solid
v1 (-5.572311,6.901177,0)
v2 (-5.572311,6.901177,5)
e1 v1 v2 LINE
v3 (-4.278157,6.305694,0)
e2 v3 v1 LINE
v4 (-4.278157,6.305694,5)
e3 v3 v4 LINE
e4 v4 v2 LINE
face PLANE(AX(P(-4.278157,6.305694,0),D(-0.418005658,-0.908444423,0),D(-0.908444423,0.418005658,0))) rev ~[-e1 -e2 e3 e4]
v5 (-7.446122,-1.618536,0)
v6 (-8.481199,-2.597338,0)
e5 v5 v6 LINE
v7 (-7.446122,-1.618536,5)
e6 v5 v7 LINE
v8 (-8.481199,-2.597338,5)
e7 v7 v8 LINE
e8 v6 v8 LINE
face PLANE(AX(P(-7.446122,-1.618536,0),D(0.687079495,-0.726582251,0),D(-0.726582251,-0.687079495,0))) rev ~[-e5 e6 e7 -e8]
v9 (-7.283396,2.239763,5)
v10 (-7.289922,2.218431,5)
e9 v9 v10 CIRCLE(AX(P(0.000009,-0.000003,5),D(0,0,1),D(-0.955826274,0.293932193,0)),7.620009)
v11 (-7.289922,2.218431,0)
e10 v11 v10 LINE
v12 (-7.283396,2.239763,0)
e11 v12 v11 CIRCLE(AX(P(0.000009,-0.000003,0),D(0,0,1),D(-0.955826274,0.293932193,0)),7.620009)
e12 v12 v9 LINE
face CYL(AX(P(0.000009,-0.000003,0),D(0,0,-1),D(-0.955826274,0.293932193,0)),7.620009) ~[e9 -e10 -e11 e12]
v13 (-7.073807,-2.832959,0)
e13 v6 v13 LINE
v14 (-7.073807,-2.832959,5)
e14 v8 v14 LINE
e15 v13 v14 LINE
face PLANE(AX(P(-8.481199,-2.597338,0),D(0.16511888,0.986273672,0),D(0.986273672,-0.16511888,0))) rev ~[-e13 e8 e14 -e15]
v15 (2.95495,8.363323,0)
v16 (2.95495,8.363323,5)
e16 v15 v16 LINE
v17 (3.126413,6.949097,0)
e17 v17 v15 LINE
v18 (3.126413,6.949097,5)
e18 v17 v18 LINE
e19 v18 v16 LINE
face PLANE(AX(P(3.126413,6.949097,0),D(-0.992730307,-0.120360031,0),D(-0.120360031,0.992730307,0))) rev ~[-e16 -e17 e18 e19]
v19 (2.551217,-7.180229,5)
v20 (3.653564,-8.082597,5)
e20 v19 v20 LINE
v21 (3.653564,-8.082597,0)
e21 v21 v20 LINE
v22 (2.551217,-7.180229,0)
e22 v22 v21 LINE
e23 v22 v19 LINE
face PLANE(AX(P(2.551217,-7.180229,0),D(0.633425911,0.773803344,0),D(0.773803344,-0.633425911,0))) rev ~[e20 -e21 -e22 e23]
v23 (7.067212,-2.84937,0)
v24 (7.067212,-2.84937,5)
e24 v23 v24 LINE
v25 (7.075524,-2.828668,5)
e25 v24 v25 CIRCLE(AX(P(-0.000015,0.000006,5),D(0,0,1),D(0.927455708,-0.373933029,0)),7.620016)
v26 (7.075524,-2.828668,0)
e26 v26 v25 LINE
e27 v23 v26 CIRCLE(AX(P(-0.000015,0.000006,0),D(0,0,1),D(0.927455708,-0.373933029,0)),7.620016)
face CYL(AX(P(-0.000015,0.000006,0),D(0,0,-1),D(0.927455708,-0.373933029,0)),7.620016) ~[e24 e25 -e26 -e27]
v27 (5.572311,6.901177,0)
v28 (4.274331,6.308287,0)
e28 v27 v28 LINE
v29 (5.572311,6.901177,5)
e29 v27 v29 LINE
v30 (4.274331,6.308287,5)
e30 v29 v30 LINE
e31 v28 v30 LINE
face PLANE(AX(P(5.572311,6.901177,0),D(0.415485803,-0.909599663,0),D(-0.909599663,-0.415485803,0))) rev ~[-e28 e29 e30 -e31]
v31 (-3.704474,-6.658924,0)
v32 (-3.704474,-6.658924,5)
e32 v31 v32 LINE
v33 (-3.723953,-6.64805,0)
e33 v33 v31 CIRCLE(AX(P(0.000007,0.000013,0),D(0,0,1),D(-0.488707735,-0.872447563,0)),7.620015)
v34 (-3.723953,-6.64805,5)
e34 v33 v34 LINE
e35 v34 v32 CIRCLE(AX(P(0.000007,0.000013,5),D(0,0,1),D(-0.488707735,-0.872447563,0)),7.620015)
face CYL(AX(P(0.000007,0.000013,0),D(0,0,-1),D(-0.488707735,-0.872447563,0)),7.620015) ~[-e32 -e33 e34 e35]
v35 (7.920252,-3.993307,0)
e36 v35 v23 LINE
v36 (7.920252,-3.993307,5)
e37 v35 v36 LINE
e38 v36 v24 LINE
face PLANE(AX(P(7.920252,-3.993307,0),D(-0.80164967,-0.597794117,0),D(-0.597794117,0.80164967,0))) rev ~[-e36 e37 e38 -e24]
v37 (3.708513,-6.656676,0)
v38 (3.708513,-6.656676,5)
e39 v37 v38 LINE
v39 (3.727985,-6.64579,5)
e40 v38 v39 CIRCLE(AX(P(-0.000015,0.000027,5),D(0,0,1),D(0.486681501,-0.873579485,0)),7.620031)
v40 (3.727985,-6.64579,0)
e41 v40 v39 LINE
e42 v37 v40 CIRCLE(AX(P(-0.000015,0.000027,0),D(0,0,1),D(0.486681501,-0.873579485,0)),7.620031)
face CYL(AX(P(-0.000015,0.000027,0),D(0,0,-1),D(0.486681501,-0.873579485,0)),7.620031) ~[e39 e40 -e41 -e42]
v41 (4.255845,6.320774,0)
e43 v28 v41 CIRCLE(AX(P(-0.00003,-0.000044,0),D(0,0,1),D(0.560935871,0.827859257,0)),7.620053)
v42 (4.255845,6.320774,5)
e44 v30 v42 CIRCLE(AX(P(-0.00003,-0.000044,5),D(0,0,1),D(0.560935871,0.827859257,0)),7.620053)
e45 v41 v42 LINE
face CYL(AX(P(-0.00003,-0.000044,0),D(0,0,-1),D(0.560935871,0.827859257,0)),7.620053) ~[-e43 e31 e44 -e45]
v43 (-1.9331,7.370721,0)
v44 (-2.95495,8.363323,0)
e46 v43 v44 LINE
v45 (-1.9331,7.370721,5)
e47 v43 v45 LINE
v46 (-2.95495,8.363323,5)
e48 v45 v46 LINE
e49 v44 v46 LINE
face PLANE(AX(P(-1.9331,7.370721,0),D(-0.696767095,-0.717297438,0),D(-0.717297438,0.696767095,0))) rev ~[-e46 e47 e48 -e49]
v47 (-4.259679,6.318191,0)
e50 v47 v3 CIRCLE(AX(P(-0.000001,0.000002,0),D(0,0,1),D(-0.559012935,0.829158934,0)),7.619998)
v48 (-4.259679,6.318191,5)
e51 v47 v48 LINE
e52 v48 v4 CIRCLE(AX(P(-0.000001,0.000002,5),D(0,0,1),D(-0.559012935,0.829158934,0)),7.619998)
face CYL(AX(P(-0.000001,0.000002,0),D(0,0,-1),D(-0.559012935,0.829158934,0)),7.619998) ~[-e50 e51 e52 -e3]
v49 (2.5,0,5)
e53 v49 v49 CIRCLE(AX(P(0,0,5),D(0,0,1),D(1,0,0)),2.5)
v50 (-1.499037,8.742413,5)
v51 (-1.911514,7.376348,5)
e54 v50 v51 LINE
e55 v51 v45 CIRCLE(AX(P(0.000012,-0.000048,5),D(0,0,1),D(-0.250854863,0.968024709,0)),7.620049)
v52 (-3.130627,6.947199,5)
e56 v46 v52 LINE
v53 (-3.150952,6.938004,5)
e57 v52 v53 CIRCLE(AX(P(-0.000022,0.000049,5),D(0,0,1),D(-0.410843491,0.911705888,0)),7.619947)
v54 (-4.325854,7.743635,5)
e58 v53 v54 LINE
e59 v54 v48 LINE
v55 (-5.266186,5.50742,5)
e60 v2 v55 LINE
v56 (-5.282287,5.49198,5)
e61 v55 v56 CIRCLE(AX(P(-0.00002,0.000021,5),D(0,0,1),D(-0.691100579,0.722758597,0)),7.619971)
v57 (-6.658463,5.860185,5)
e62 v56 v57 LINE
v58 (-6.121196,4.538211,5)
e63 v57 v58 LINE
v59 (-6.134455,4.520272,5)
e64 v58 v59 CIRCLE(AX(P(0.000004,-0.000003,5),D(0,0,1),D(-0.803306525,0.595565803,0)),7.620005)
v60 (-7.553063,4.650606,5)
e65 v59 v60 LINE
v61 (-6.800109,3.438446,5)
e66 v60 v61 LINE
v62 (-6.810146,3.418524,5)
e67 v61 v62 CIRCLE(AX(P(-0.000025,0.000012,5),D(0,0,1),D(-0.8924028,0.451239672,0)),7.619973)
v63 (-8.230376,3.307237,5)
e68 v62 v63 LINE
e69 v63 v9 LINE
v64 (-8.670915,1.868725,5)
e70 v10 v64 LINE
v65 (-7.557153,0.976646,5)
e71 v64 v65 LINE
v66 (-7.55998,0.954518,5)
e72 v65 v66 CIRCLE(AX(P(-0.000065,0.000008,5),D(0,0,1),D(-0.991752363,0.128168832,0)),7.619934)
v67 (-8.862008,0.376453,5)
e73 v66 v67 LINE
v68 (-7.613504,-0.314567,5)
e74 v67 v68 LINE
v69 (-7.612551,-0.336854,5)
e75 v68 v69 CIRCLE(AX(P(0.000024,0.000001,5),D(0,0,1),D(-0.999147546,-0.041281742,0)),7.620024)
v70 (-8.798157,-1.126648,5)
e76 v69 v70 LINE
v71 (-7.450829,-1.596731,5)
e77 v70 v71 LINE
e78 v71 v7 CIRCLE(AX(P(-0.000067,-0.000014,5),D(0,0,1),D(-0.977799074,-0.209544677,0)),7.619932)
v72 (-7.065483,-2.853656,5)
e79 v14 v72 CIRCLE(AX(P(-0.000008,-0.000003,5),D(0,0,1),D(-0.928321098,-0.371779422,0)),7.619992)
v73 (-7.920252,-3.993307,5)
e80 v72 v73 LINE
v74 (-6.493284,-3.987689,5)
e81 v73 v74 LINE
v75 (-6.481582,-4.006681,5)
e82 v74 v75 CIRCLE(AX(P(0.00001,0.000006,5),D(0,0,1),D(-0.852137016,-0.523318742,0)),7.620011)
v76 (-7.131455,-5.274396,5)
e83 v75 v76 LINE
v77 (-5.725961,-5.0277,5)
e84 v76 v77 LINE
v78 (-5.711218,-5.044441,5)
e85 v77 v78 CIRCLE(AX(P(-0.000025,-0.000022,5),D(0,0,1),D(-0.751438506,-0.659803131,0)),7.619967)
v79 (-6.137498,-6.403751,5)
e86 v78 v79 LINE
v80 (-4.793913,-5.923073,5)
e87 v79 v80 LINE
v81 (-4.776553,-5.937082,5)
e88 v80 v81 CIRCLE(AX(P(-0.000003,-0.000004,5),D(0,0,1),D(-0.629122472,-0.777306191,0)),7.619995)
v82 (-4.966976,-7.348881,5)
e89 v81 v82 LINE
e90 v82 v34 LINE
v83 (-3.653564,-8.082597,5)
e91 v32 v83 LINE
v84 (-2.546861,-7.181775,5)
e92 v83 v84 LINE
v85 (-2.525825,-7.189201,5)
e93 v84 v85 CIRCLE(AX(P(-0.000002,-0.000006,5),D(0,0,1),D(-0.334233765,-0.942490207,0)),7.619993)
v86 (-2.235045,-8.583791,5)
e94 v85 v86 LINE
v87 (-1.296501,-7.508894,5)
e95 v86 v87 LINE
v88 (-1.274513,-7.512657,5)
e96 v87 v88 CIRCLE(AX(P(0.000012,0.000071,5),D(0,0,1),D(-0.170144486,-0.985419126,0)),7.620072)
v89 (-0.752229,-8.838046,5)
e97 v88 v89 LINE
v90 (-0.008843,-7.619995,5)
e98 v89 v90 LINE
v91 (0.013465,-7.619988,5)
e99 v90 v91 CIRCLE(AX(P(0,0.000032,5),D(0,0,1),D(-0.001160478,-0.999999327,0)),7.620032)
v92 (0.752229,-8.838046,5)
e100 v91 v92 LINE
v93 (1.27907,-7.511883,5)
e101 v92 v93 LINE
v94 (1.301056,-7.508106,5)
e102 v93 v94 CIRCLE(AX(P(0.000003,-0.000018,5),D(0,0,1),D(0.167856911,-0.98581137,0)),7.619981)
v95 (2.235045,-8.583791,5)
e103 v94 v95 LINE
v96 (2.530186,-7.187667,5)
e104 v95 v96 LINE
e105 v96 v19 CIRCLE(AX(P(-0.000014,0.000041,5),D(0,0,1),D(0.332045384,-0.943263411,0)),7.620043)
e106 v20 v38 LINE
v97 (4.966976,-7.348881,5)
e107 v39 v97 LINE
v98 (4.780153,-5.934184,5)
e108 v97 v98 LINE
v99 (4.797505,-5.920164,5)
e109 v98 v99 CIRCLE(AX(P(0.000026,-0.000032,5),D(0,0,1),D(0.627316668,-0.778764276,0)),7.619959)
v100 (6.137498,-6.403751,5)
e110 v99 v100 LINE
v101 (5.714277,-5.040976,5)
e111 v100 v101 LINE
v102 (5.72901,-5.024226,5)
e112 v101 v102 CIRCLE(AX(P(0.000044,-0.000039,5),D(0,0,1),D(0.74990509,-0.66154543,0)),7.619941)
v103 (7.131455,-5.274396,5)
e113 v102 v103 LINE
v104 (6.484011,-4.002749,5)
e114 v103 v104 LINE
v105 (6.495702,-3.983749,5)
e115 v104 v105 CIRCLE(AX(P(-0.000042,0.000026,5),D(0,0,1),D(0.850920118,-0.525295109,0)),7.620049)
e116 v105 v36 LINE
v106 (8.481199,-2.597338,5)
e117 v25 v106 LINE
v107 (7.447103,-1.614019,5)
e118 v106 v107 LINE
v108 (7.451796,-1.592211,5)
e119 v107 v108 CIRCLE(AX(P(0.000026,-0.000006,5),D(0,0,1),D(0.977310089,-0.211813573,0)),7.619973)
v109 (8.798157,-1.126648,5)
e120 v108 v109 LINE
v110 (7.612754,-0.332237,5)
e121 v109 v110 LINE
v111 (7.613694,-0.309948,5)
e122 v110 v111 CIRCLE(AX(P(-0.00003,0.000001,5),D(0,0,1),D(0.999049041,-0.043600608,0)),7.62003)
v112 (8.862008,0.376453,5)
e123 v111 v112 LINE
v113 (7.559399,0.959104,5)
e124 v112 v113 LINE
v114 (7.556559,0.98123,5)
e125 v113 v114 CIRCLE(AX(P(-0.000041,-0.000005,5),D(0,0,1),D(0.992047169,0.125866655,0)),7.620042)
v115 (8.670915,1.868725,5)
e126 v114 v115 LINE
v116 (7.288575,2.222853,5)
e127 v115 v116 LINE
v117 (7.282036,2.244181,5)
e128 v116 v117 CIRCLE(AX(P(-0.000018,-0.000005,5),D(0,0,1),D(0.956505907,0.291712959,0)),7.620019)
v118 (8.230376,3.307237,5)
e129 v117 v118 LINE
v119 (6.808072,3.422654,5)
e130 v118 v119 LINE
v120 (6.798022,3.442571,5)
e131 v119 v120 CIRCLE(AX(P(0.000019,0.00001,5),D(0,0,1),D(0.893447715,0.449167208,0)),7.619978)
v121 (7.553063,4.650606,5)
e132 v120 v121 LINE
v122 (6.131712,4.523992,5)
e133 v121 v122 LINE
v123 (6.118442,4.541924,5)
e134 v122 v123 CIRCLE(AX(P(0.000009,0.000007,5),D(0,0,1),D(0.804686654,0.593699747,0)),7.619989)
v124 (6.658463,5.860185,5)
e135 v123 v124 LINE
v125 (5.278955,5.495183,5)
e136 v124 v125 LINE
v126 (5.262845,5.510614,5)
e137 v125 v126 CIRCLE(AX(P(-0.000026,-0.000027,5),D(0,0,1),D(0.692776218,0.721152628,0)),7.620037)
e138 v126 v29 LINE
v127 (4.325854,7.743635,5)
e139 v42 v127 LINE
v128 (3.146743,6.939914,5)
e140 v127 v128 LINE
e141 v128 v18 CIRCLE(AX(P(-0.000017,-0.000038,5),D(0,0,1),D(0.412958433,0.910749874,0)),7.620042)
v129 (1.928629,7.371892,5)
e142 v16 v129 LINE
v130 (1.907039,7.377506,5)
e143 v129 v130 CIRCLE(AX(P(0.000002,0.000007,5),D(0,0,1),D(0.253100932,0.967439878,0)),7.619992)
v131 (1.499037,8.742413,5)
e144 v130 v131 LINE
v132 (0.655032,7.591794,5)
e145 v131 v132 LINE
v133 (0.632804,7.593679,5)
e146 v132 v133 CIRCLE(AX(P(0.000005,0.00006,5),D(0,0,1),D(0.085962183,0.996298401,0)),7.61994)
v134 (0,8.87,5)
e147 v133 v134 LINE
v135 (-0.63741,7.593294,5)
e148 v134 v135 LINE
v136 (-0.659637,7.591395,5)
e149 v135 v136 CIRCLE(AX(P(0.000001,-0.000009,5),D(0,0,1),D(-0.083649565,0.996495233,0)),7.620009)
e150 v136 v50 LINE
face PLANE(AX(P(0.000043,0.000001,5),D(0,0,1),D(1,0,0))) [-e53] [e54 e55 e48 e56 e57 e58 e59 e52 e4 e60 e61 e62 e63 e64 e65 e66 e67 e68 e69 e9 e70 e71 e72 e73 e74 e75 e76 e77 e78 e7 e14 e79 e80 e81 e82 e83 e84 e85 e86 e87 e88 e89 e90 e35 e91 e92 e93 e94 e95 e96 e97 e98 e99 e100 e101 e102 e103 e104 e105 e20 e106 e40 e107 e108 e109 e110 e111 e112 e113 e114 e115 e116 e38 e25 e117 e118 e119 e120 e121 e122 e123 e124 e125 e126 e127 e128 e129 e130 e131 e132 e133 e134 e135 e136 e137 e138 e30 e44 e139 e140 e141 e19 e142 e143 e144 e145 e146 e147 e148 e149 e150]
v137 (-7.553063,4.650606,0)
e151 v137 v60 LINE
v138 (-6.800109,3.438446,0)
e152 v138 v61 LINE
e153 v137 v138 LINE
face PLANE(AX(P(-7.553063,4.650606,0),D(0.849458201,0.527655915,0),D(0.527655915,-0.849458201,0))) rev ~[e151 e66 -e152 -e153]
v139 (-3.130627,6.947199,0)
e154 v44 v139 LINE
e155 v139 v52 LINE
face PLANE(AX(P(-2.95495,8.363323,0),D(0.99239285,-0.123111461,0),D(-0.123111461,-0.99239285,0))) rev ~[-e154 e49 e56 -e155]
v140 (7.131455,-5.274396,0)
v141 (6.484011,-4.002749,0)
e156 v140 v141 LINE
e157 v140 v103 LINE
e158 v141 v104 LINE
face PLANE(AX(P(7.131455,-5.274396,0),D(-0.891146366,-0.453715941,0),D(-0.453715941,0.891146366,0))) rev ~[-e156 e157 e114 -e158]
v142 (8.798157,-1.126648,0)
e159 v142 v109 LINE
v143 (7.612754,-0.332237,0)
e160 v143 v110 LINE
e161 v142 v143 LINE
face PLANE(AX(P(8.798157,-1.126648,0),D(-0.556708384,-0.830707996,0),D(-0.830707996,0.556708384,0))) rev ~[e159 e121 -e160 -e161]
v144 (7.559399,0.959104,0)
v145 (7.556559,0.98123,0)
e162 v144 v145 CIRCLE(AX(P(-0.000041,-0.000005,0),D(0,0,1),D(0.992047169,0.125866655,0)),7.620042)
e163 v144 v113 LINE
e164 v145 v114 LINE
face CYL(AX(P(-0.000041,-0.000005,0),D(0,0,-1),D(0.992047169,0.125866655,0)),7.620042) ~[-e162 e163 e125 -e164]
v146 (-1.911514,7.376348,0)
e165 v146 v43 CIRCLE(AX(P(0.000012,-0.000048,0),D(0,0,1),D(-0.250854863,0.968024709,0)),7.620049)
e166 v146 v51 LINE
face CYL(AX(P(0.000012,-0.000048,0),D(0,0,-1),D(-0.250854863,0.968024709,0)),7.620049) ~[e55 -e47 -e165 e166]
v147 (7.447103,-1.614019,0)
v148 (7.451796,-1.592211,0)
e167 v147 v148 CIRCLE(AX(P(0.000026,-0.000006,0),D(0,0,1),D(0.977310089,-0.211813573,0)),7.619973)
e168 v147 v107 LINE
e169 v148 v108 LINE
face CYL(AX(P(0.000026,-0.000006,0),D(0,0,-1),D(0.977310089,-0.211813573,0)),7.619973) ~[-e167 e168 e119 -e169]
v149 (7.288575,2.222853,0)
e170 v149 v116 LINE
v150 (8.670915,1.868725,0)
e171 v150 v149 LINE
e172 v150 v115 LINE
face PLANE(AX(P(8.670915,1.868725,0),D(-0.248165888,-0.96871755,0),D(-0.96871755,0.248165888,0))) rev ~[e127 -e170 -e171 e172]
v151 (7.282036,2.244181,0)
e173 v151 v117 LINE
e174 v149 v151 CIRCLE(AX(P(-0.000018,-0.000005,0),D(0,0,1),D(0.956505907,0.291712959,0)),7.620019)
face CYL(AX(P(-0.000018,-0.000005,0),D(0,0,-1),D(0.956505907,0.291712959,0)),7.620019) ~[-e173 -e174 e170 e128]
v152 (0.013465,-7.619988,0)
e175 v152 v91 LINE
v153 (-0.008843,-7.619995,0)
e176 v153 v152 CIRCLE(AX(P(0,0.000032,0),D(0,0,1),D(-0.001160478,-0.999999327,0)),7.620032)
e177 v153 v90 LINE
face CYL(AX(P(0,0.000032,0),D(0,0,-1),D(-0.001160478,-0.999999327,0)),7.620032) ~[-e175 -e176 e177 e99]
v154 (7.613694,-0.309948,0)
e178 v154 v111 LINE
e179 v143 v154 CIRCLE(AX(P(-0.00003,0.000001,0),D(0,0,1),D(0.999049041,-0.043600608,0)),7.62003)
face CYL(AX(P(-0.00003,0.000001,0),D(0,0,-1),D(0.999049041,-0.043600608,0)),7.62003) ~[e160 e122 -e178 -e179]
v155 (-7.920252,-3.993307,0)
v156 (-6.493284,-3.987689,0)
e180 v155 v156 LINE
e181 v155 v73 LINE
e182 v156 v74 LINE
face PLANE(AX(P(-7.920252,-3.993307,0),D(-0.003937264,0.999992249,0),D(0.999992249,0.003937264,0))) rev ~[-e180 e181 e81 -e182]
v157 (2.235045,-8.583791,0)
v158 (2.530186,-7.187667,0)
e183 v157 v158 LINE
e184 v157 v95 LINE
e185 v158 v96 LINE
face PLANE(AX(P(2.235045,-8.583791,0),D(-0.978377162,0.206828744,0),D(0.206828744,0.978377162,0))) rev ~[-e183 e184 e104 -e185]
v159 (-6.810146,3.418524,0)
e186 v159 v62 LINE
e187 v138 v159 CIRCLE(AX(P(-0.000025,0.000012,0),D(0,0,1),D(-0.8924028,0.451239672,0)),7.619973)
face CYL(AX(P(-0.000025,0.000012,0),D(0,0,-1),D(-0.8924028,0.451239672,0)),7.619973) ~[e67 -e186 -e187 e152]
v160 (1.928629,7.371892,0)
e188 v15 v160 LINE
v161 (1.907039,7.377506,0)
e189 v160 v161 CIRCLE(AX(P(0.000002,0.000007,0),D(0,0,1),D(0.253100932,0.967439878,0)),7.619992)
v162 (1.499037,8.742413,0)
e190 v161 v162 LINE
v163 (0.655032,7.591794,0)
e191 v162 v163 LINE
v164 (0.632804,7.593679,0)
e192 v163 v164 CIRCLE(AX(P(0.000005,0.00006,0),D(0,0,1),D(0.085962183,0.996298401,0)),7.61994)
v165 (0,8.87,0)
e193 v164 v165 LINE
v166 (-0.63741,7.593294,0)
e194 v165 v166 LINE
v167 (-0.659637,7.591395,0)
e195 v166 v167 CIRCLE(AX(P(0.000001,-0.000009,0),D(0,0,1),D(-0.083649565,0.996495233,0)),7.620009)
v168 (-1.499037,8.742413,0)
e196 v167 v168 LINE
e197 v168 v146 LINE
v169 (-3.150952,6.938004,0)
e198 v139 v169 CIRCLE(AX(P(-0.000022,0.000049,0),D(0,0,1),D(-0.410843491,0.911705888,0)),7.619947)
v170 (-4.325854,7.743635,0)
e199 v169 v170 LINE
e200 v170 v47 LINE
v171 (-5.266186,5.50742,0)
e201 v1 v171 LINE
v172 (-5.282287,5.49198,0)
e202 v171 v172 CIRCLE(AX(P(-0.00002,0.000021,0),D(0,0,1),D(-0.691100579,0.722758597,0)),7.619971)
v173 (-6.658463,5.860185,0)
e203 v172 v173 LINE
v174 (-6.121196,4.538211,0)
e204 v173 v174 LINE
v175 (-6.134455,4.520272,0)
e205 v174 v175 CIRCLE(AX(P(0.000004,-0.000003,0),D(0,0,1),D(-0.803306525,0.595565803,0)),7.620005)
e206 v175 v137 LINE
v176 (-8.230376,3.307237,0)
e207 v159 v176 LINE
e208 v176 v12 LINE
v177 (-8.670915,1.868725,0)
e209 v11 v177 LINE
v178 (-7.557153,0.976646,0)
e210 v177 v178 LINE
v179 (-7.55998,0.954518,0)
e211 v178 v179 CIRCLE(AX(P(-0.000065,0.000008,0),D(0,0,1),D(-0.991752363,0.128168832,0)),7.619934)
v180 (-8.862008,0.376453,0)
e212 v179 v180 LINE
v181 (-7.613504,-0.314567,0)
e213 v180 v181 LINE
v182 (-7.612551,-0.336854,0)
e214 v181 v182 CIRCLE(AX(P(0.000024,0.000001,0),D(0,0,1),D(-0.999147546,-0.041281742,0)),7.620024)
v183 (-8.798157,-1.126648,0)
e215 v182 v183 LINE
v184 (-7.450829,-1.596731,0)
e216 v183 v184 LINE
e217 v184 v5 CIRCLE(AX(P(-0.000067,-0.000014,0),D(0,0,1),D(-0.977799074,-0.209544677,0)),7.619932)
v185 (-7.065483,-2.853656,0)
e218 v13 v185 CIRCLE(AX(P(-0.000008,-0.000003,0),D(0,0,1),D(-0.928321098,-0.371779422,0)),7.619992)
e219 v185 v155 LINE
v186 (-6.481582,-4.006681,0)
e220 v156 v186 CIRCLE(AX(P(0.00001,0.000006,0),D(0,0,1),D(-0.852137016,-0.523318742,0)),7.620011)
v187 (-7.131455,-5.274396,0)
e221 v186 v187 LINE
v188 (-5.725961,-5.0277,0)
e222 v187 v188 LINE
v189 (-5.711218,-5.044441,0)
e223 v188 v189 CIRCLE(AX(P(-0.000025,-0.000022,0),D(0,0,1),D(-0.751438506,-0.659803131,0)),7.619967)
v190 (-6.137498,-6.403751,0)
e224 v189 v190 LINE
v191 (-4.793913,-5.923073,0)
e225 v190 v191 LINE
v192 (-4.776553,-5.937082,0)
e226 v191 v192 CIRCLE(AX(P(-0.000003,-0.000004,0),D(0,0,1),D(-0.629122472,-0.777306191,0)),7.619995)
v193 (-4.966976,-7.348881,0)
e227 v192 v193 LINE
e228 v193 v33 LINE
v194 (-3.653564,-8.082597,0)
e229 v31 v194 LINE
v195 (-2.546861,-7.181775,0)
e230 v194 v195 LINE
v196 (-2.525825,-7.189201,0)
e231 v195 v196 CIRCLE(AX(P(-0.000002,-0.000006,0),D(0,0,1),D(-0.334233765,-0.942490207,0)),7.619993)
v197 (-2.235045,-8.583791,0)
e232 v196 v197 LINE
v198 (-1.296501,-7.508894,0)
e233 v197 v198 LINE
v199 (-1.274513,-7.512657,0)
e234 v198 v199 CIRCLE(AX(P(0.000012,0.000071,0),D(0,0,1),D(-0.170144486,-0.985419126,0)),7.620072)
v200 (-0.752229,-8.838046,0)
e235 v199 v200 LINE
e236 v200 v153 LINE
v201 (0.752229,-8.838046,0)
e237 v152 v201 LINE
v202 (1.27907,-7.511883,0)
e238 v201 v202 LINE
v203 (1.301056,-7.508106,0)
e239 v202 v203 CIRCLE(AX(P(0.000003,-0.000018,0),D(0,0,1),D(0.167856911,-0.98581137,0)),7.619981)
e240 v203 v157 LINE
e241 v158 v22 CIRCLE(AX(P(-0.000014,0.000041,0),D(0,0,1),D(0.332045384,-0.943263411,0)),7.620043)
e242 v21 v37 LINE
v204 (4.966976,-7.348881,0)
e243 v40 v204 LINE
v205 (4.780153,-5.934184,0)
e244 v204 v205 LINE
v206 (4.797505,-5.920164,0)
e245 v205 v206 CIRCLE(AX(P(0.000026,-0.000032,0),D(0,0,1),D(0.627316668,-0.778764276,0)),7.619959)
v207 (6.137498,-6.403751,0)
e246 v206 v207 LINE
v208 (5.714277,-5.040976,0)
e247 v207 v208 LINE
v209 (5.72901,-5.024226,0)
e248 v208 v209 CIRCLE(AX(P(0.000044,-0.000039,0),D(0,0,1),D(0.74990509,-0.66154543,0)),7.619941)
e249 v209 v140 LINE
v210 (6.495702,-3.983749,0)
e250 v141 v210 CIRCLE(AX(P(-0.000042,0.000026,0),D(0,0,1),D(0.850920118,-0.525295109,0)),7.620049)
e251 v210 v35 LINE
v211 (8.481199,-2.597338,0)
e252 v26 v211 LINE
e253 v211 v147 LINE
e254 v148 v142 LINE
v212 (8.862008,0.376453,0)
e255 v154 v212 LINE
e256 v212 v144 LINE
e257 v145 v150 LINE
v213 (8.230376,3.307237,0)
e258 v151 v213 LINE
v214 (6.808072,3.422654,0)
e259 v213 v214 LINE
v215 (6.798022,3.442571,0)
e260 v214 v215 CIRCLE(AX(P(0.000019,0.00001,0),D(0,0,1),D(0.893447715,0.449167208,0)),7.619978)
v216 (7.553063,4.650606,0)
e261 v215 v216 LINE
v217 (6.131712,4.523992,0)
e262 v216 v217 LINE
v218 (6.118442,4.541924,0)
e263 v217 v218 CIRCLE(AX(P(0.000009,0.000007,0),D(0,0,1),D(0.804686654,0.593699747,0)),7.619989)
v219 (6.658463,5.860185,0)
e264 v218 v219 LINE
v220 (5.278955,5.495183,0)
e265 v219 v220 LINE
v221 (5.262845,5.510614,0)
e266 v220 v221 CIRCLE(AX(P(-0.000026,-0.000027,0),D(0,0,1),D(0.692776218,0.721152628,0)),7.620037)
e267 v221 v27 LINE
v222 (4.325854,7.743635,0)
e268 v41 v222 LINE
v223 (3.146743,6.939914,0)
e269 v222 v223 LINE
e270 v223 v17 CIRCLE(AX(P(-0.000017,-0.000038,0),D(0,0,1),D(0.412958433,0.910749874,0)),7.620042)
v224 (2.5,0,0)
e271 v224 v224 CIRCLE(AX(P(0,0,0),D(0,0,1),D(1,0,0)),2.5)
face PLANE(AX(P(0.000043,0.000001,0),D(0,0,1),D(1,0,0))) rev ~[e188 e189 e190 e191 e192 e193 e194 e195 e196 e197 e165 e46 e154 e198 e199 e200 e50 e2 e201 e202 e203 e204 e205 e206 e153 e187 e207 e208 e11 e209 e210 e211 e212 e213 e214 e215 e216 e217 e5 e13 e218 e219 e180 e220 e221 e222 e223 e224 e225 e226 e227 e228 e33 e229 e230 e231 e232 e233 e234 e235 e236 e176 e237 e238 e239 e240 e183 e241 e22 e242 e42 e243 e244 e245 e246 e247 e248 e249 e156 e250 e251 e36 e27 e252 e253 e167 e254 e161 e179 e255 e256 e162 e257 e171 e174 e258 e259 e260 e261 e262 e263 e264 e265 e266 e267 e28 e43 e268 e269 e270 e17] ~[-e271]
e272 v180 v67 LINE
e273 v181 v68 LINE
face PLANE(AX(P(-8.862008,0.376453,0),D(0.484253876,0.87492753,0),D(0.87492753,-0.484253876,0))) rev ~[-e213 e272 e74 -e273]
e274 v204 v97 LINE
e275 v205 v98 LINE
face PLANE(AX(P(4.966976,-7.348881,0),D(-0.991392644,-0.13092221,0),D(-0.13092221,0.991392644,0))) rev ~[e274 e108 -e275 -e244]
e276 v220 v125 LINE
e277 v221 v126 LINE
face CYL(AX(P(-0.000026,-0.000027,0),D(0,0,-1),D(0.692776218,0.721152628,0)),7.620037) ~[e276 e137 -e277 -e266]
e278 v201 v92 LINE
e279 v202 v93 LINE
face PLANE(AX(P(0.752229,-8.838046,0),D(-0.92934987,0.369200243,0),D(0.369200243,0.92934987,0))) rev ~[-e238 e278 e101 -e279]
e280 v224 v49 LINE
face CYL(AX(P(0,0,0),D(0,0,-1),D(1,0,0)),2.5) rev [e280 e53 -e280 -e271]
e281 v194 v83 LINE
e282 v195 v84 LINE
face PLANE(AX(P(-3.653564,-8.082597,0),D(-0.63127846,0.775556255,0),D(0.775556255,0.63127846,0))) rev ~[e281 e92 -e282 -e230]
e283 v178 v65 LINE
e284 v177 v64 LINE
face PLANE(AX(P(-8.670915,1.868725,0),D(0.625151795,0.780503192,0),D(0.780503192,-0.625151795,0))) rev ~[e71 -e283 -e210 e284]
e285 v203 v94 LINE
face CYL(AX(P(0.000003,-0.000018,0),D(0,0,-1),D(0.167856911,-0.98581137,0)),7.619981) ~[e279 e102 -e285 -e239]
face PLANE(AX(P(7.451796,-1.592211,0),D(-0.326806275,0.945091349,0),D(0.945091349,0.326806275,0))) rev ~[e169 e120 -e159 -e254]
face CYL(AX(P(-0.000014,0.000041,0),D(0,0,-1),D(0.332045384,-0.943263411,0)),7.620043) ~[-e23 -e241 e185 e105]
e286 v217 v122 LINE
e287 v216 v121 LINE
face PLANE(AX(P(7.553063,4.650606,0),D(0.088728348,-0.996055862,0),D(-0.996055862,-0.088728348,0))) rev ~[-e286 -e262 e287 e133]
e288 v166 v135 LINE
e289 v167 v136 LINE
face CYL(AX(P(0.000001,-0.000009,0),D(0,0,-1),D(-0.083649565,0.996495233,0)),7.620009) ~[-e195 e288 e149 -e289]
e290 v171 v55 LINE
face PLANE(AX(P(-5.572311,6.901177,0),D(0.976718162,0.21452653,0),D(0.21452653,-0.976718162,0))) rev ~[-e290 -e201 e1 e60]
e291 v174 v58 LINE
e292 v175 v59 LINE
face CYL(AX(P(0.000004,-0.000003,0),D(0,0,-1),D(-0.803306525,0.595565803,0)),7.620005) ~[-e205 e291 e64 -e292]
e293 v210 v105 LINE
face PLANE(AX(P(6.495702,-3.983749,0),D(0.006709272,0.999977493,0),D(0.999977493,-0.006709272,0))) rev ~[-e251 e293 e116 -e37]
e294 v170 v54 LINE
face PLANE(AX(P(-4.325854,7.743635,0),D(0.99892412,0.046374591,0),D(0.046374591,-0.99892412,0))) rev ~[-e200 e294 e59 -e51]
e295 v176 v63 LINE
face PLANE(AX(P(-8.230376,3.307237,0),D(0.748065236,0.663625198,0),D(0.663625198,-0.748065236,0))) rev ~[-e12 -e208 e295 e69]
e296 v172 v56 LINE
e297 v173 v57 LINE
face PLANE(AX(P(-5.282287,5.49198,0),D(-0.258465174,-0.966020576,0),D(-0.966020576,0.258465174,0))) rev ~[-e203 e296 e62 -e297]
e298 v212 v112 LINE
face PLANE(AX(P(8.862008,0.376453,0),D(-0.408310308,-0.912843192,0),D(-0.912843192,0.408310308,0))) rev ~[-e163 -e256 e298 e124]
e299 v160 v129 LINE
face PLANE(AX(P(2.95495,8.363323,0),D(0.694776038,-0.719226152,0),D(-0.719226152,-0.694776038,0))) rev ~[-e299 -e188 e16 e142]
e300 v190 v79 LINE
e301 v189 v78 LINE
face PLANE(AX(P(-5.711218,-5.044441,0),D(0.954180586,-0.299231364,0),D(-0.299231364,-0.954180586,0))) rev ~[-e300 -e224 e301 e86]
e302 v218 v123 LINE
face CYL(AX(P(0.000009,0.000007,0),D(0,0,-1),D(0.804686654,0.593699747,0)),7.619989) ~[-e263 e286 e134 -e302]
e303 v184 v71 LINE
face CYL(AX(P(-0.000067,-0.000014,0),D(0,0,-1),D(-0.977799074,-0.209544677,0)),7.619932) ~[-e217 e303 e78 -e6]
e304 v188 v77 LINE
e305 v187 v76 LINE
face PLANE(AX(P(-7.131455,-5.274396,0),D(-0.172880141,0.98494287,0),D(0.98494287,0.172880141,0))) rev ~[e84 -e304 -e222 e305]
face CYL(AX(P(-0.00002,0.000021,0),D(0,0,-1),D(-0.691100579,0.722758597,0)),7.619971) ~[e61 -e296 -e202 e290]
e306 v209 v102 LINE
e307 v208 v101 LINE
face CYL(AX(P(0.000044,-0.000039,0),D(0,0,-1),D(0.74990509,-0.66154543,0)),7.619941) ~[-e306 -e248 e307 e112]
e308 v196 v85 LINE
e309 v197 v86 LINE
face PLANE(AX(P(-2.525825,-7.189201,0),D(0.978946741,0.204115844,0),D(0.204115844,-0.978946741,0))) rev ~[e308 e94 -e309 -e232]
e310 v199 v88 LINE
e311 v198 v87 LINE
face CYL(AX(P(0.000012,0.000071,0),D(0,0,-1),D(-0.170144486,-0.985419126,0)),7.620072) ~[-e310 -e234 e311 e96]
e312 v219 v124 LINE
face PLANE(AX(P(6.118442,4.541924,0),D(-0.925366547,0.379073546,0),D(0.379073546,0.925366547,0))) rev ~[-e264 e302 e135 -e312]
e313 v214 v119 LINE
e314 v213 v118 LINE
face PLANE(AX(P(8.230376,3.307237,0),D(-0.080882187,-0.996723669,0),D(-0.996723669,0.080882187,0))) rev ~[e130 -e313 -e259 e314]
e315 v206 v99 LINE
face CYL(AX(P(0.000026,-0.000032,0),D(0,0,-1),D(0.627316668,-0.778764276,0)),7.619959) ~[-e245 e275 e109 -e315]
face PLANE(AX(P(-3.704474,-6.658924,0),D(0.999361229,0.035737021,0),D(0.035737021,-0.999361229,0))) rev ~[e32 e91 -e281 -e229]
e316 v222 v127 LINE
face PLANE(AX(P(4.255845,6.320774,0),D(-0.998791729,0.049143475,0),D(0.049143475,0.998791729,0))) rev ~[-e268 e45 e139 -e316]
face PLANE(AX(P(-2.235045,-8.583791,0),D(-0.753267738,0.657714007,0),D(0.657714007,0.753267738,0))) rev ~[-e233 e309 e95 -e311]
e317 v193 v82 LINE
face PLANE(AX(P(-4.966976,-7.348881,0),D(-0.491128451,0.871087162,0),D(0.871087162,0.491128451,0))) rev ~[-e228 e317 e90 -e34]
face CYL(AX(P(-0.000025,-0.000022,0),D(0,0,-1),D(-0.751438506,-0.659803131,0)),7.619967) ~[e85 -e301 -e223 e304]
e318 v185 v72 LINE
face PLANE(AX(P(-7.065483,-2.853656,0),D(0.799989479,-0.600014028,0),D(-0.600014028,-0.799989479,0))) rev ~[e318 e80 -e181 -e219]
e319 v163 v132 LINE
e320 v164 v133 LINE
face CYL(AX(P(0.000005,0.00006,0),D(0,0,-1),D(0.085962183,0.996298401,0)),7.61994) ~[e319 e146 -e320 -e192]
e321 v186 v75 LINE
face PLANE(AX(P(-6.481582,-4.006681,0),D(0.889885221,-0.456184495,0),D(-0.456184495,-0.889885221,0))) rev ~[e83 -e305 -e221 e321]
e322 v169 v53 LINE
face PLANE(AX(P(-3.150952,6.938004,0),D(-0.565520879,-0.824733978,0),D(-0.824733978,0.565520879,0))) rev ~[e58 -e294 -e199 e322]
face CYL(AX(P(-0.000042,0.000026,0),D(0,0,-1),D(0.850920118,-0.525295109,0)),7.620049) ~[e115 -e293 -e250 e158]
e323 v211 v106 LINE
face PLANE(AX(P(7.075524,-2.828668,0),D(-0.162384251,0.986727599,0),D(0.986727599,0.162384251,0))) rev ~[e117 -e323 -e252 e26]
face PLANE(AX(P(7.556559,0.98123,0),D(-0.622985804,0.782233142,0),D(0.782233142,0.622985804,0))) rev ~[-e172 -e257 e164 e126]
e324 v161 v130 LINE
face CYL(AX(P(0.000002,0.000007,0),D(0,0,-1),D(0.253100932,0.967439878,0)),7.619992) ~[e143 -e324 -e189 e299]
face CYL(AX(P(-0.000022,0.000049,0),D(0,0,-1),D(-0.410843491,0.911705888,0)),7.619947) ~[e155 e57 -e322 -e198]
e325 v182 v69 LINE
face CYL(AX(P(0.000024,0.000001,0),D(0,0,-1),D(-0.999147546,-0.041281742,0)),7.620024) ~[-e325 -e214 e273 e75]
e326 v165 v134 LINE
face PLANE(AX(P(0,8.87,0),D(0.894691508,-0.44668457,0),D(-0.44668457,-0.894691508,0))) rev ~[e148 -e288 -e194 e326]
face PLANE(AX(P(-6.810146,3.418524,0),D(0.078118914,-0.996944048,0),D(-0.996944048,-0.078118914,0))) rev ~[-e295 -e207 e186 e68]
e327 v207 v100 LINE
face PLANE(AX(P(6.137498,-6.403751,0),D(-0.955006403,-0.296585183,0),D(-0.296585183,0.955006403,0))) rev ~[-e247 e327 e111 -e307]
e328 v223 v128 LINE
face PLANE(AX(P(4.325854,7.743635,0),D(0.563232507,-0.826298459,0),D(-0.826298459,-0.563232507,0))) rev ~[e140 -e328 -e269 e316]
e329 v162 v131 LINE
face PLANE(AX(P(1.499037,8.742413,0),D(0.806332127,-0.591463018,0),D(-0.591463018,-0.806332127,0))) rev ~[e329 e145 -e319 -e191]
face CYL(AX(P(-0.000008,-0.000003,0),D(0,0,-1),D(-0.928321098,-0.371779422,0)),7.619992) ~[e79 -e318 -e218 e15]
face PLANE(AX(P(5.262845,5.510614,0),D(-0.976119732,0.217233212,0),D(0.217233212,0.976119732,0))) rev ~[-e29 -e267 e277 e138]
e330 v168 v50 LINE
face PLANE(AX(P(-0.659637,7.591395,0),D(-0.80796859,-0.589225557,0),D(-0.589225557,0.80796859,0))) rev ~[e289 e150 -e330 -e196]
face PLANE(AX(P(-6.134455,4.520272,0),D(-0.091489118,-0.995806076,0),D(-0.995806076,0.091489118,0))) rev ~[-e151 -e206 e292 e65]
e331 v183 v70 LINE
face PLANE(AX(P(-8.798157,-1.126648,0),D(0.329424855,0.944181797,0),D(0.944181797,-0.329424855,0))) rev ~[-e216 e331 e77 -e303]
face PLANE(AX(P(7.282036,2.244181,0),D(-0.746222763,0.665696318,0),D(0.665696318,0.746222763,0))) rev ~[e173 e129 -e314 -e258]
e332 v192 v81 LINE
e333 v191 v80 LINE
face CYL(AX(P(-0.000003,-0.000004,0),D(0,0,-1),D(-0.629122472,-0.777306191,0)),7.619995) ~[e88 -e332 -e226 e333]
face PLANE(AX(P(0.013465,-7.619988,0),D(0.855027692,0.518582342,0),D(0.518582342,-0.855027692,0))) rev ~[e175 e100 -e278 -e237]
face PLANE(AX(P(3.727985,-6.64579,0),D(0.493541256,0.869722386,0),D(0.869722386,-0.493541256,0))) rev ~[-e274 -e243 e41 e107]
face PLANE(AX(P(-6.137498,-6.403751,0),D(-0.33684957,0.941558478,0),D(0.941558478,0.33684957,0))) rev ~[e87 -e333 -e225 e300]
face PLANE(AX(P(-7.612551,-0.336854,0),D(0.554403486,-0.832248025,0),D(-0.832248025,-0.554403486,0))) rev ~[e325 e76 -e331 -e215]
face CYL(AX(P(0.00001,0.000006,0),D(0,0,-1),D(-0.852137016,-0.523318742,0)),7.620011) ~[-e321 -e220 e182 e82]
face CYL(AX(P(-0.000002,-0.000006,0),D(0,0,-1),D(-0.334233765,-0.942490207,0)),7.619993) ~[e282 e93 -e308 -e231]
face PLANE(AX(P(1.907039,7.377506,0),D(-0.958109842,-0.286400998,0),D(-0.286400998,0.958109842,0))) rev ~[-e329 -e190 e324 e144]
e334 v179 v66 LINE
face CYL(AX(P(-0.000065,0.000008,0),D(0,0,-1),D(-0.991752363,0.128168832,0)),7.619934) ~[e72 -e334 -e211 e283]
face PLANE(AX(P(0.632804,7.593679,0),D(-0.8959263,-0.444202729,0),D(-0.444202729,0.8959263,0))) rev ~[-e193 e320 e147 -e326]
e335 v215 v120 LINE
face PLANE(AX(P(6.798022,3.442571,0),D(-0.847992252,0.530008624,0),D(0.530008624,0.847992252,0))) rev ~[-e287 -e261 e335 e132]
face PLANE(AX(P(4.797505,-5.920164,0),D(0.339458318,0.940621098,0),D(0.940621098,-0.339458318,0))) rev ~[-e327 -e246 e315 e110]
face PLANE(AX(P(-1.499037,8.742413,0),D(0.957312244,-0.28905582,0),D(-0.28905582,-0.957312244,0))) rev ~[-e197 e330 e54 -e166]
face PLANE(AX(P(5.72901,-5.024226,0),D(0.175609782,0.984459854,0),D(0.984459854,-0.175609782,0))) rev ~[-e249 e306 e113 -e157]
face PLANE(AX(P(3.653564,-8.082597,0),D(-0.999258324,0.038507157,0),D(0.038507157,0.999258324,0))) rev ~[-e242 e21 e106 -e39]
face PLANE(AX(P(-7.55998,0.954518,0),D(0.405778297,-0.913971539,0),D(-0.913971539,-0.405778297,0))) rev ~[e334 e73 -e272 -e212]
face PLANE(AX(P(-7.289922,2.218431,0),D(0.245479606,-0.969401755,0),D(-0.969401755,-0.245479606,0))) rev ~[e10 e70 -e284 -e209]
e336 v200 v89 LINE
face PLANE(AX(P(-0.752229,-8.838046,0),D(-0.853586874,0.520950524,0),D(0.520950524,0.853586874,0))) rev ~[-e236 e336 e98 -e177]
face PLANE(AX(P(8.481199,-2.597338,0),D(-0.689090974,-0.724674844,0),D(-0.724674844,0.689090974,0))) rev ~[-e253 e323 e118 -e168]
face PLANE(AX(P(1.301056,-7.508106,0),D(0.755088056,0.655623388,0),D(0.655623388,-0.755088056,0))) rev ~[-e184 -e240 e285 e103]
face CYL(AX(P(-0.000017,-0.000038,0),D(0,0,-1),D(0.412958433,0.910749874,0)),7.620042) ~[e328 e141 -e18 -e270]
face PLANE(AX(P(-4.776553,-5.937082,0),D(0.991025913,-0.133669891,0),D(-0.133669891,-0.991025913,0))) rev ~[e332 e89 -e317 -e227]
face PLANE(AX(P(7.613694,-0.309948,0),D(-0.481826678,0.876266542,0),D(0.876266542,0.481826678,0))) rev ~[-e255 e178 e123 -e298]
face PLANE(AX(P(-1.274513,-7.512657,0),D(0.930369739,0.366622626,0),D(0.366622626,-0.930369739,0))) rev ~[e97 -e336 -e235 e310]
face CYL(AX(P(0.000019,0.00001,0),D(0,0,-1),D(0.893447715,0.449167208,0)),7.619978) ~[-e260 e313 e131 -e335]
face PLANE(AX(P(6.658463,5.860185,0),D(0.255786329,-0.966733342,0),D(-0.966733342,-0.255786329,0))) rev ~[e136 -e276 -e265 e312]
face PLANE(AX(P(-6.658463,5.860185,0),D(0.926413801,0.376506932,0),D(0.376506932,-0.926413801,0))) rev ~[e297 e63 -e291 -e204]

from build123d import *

# Parameters (mm, degrees)
F0_R     = 2.5
F1_DEPTH = 5


# Not quite as in the source:
# - a feature names something its author has since deleted; it is built from what else it names


with BuildPart() as f1:
    # F0 (on Top) → F1 (new body)
    with BuildSketch(Plane.XY):
        with BuildLine():
            ThreePointArc((0.6328035034, 7.5936789322), (-0.0023111215, 7.6199996495), (-0.6374096636, 7.5932936807))
            ThreePointArc((-0.6374096636, 7.5932936807), (-0.6485239105, 7.5923525167), (-0.6596367677, 7.5913950849))
            ThreePointArc((-0.6596367677, 7.5913950849), (-1.2900640698, 7.51000231), (-1.9115139669, 7.3763483076))
            ThreePointArc((-1.9115139669, 7.3763483076), (-1.9223092879, 7.3735423645), (-1.9331004901, 7.3707206225))
            ThreePointArc((-1.9331004901, 7.3707206225), (-2.5407042235, 7.1839558774), (-3.1306274935, 6.9471988237))
            ThreePointArc((-3.1306274935, 6.9471988237), (-3.140793327, 6.9426088236), (-3.1509524309, 6.9380039477))
            ThreePointArc((-3.1509524309, 6.9380039477), (-3.7182529426, 6.651240114), (-4.2596785672, 6.3181910785))
            ThreePointArc((-4.2596785672, 6.3181910785), (-4.2689224606, 6.3119490671), (-4.2781572072, 6.3056935313))
            ThreePointArc((-4.2781572072, 6.3056935313), (-4.7888342944, 5.9271802825), (-5.266186444, 5.5074204794))
            ThreePointArc((-5.266186444, 5.5074204794), (-5.2742424674, 5.4997060281), (-5.2822871898, 5.4919797928))
            ThreePointArc((-5.2822871898, 5.4919797928), (-5.7216496025, 5.0326062658), (-6.1211957249, 4.5382114205))
            ThreePointArc((-6.1211957249, 4.5382114205), (-6.1278321211, 4.52924646), (-6.1344553875, 4.5202717948))
            ThreePointArc((-6.1344553875, 4.5202717948), (-6.4898634689, 3.9932533296), (-6.8001093497, 3.4384462817))
            ThreePointArc((-6.8001093497, 3.4384462817), (-6.8051352017, 3.4284887176), (-6.8101464726, 3.4185238073))
            ThreePointArc((-6.8101464726, 3.4185238073), (-7.0713757794, 2.8390217657), (-7.2833962094, 2.2397633037))
            ThreePointArc((-7.2833962094, 2.2397633037), (-7.2866669326, 2.229099597), (-7.289922043, 2.218431114))
            ThreePointArc((-7.289922043, 2.218431114), (-7.4494574836, 1.6031167146), (-7.557153021, 0.9766464135))
            ThreePointArc((-7.557153021, 0.9766464135), (-7.5585745227, 0.9655833395), (-7.5599798288, 0.9545181966))
            ThreePointArc((-7.5599798288, 0.9545181966), (-7.6132318591, 0.3210929144), (-7.6135042995, -0.314566816))
            ThreePointArc((-7.6135042995, -0.314566816), (-7.6130356855, -0.3257109926), (-7.6125507594, -0.3368544714))
            ThreePointArc((-7.6125507594, -0.3368544714), (-7.5579874154, -0.9701681444), (-7.4508289211, -1.5967305308))
            ThreePointArc((-7.4508289211, -1.5967305308), (-7.4484836728, -1.6076352125), (-7.4461224648, -1.6185364495))
            ThreePointArc((-7.4461224648, -1.6185364495), (-7.2853134346, -2.233519232), (-7.0738067604, -2.8329592155))
            ThreePointArc((-7.0738067604, -2.8329592155), (-7.0696523462, -2.8433106943), (-7.0654827841, -2.8536560809))
            ThreePointArc((-7.0654827841, -2.8536560809), (-6.8030542506, -3.4326160379), (-6.4932840584, -3.9876888214))
            ThreePointArc((-6.4932840584, -3.9876888214), (-6.4874399932, -3.9971893043), (-6.4815820277, -4.0066812225))
            ThreePointArc((-6.4815820277, -4.0066812225), (-6.1250835821, -4.5329627301), (-5.7259613964, -5.0276998804))
            ThreePointArc((-5.7259613964, -5.0276998804), (-5.7185958034, -5.0360760556), (-5.7112179573, -5.0444414402))
            ThreePointArc((-5.7112179573, -5.0444414402), (-5.2709054108, -5.5029043377), (-4.7939132502, -5.9230731677))
            ThreePointArc((-4.7939132502, -5.9230731677), (-4.785238024, -5.930084068), (-4.7765525447, -5.9370822621))
            ThreePointArc((-4.7765525447, -5.9370822621), (-4.2650928876, -6.3145374066), (-3.7239529481, -6.648050424))
            ThreePointArc((-3.7239529481, -6.648050424), (-3.7142176592, -6.6534943586), (-3.7044744121, -6.658924037))
            ThreePointArc((-3.7044744121, -6.658924037), (-3.1365814075, -6.9445127312), (-2.5468612998, -7.1817753738))
            ThreePointArc((-2.5468612998, -7.1817753738), (-2.5363460148, -7.1854957305), (-2.5258252953, -7.1892006911))
            ThreePointArc((-2.5258252953, -7.1892006911), (-1.917836191, -7.3747070684), (-1.296501089, -7.5088937219))
            ThreePointArc((-1.296501089, -7.5088937219), (-1.2855083135, -7.5107834728), (-1.2745127836, -7.5126571308))
            ThreePointArc((-1.2745127836, -7.5126571308), (-0.6439183191, -7.5927445103), (-0.0088429024, -7.619994869))
            ThreePointArc((-0.0088429024, -7.619994869), (0.0023111215, -7.6199996495), (0.0134651405, -7.619988103))
            ThreePointArc((0.0134651405, -7.619988103), (0.6485239105, -7.5923525167), (1.2790696784, -7.5118826374))
            ThreePointArc((1.2790696784, -7.5118826374), (1.2900640698, -7.51000231), (1.3010556969, -7.5081058912))
            ThreePointArc((1.3010556969, -7.5081058912), (1.9223092879, -7.3735423645), (2.5301857534, -7.1876672192))
            ThreePointArc((2.5301857534, -7.1876672192), (2.5407042235, -7.1839558774), (2.5512172498, -7.1802291429))
            ThreePointArc((2.5512172498, -7.1802291429), (3.140793327, -6.9426088236), (3.7085129909, -6.6566757016))
            ThreePointArc((3.7085129909, -6.6566757016), (3.7182529426, -6.651240114), (3.7279849274, -6.6457902751))
            ThreePointArc((3.7279849274, -6.6457902751), (4.2689224606, -6.3119490671), (4.7801530617, -5.9341837439))
            ThreePointArc((4.7801530617, -5.9341837439), (4.7888342944, -5.9271802825), (4.7975052662, -5.9201641211))
            ThreePointArc((4.7975052662, -5.9201641211), (5.2742424674, -5.4997060281), (5.7142768322, -5.0409761242))
            ThreePointArc((5.7142768322, -5.0409761242), (5.7216496025, -5.0326062658), (5.7290101132, -5.0242256241))
            ThreePointArc((5.7290101132, -5.0242256241), (6.1278321211, -4.52924646), (6.4840112622, -4.0027487995))
            ThreePointArc((6.4840112622, -4.0027487995), (6.4898634689, -3.9932533296), (6.4957017701, -3.9837493036))
            ThreePointArc((6.4957017701, -3.9837493036), (6.8051352017, -3.4284887176), (7.0672124935, -2.8493696796))
            ThreePointArc((7.0672124935, -2.8493696796), (7.0713757794, -2.8390217657), (7.0755239138, -2.8286677687))
            ThreePointArc((7.0755239138, -2.8286677687), (7.2866669326, -2.229099597), (7.4471028887, -1.6140193819))
            ThreePointArc((7.4471028887, -1.6140193819), (7.4494574836, -1.6031167146), (7.4517961168, -1.5922106123))
            ThreePointArc((7.4517961168, -1.5922106123), (7.5585745227, -0.9655833395), (7.6127536927, -0.3322366852))
            ThreePointArc((7.6127536927, -0.3322366852), (7.6132318591, -0.3210929144), (7.613693713, -0.3099484555))
            ThreePointArc((7.613693713, -0.3099484555), (7.6184232651, -0.1550063017), (7.62, 0))
            ThreePointArc((7.62, 0), (7.6048347675, 0.4805082297), (7.5593994334, 0.959103856))
            ThreePointArc((7.5593994334, 0.959103856), (7.5579874154, 0.9701681444), (7.5565592033, 0.981230354))
            ThreePointArc((7.5565592033, 0.981230354), (7.4484836728, 1.6076352125), (7.2885750158, 2.2228527255))
            ThreePointArc((7.2885750158, 2.2228527255), (7.2853134346, 2.233519232), (7.2820362435, 2.2441809528))
            ThreePointArc((7.2820362435, 2.2441809528), (7.0696523462, 2.8433106943), (6.8080715652, 3.4226541693))
            ThreePointArc((6.8080715652, 3.4226541693), (6.8030542506, 3.4326160379), (6.7980223593, 3.4425705516))
            ThreePointArc((6.7980223593, 3.4425705516), (6.4874399932, 3.9971893043), (6.1317122912, 4.5239920842))
            ThreePointArc((6.1317122912, 4.5239920842), (6.1250835821, 4.5329627301), (6.118441749, 4.5419236634))
            ThreePointArc((6.118441749, 4.5419236634), (5.7185958034, 5.0360760556), (5.2789548185, 5.4951829837))
            ThreePointArc((5.2789548185, 5.4951829837), (5.2709054108, 5.5029043377), (5.2628447094, 5.5106139009))
            ThreePointArc((5.2628447094, 5.5106139009), (4.785238024, 5.930084068), (4.2743314271, 6.3082874738))
            ThreePointArc((4.2743314271, 6.3082874738), (4.2650928876, 6.3145374066), (4.2558452095, 6.3207738096))
            ThreePointArc((4.2558452095, 6.3207738096), (3.7142176592, 6.6534943586), (3.1467433027, 6.9399140187))
            ThreePointArc((3.1467433027, 6.9399140187), (3.1365814075, 6.9445127312), (3.1264127916, 6.9490965641))
            ThreePointArc((3.1264127916, 6.9490965641), (2.5363460148, 7.1854957305), (1.9286291028, 7.3718918728))
            ThreePointArc((1.9286291028, 7.3718918728), (1.917836191, 7.3747070684), (1.9070391699, 7.3775064625))
            ThreePointArc((1.9070391699, 7.3775064625), (1.2855083135, 7.5107834728), (0.6550317551, 7.5917938196))
            ThreePointArc((0.6550317551, 7.5917938196), (0.6439183191, 7.5927445103), (0.6328035034, 7.5936789322))
        make_face()
        Circle(F0_R, mode=Mode.SUBTRACT)
        with BuildLine():
            ThreePointArc((-6.1211957249, 4.5382114205), (-5.7216496025, 5.0326062658), (-5.2822871898, 5.4919797928))
            Line((-5.2822871898, 5.4919797928), (-6.6584633476, 5.8601847965))
            Line((-6.6584633476, 5.8601847965), (-6.1211957249, 4.5382114205))
        make_face()
        with BuildLine():
            ThreePointArc((-5.266186444, 5.5074204794), (-4.7888342944, 5.9271802825), (-4.2781572072, 6.3056935313))
            Line((-4.2781572072, 6.3056935313), (-5.572311376, 6.9011771408))
            Line((-5.572311376, 6.9011771408), (-5.266186444, 5.5074204794))
        make_face()
        with BuildLine():
            ThreePointArc((-4.2596785672, 6.3181910785), (-3.7182529426, 6.651240114), (-3.1509524309, 6.9380039477))
            Line((-3.1509524309, 6.9380039477), (-4.3258541516, 7.7436351837))
            Line((-4.3258541516, 7.7436351837), (-4.2596785672, 6.3181910785))
        make_face()
        with BuildLine():
            ThreePointArc((-3.1306274935, 6.9471988237), (-2.5407042235, 7.1839558774), (-1.9331004901, 7.3707206225))
            Line((-1.9331004901, 7.3707206225), (-2.9549499794, 8.3633229412))
            Line((-2.9549499794, 8.3633229412), (-3.1306274935, 6.9471988237))
        make_face()
        with BuildLine():
            ThreePointArc((-1.9115139669, 7.3763483076), (-1.2900640698, 7.51000231), (-0.6596367677, 7.5913950849))
            Line((-0.6596367677, 7.5913950849), (-1.4990372763, 8.7424131248))
            Line((-1.4990372763, 8.7424131248), (-1.9115139669, 7.3763483076))
        make_face()
        with BuildLine():
            Line((1.4990372763, 8.7424131248), (0.6550317551, 7.5917938196))
            ThreePointArc((0.6550317551, 7.5917938196), (1.2855083135, 7.5107834728), (1.9070391699, 7.3775064625))
            Line((1.9070391699, 7.3775064625), (1.4990372763, 8.7424131248))
        make_face()
        with BuildLine():
            Line((2.9549499794, 8.3633229412), (1.9286291028, 7.3718918728))
            ThreePointArc((1.9286291028, 7.3718918728), (2.5363460148, 7.1854957305), (3.1264127916, 6.9490965641))
            Line((3.1264127916, 6.9490965641), (2.9549499794, 8.3633229412))
        make_face()
        with BuildLine():
            Line((4.3258541516, 7.7436351837), (3.1467433027, 6.9399140187))
            ThreePointArc((3.1467433027, 6.9399140187), (3.7142176592, 6.6534943586), (4.2558452095, 6.3207738096))
            Line((4.2558452095, 6.3207738096), (4.3258541516, 7.7436351837))
        make_face()
        with BuildLine():
            Line((5.572311376, 6.9011771408), (4.2743314271, 6.3082874738))
            ThreePointArc((4.2743314271, 6.3082874738), (4.785238024, 5.930084068), (5.2628447094, 5.5106139009))
            Line((5.2628447094, 5.5106139009), (5.572311376, 6.9011771408))
        make_face()
        with BuildLine():
            Line((6.6584633476, 5.8601847965), (5.2789548185, 5.4951829837))
            ThreePointArc((5.2789548185, 5.4951829837), (5.7185958034, 5.0360760556), (6.118441749, 4.5419236634))
            Line((6.118441749, 4.5419236634), (6.6584633476, 5.8601847965))
        make_face()
        with BuildLine():
            Line((7.5530634517, 4.6506056052), (6.1317122912, 4.5239920842))
            ThreePointArc((6.1317122912, 4.5239920842), (6.4874399932, 3.9971893043), (6.7980223593, 3.4425705516))
            Line((6.7980223593, 3.4425705516), (7.5530634517, 4.6506056052))
        make_face()
        with BuildLine():
            Line((8.2303756721, 3.3072369579), (6.8080715652, 3.4226541693))
            ThreePointArc((6.8080715652, 3.4226541693), (7.0696523462, 2.8433106943), (7.2820362435, 2.2441809528))
            Line((7.2820362435, 2.2441809528), (8.2303756721, 3.3072369579))
        make_face()
        with BuildLine():
            Line((8.6709149695, 1.8687251249), (7.2885750158, 2.2228527255))
            ThreePointArc((7.2885750158, 2.2228527255), (7.4484836728, 1.6076352125), (7.5565592033, 0.981230354))
            Line((7.5565592033, 0.981230354), (8.6709149695, 1.8687251249))
        make_face()
        with BuildLine():
            Line((8.8620078302, 0.3764534723), (7.5593994334, 0.959103856))
            ThreePointArc((7.5593994334, 0.959103856), (7.6048347675, 0.4805082297), (7.62, 0))
            ThreePointArc((7.62, 0), (7.6184232651, -0.1550063017), (7.613693713, -0.3099484555))
            Line((7.613693713, -0.3099484555), (8.8620078302, 0.3764534723))
        make_face()
        with BuildLine():
            Line((8.7981568607, -1.1266480612), (7.6127536927, -0.3322366852))
            ThreePointArc((7.6127536927, -0.3322366852), (7.5585745227, -0.9655833395), (7.4517961168, -1.5922106123))
            Line((7.4517961168, -1.5922106123), (8.7981568607, -1.1266480612))
        make_face()
        with BuildLine():
            Line((8.4811989371, -2.5973379812), (7.4471028887, -1.6140193819))
            ThreePointArc((7.4471028887, -1.6140193819), (7.2866669326, -2.229099597), (7.0755239138, -2.8286677687))
            Line((7.0755239138, -2.8286677687), (8.4811989371, -2.5973379812))
        make_face()
        with BuildLine():
            Line((7.9202523618, -3.9933072165), (7.0672124935, -2.8493696796))
            ThreePointArc((7.0672124935, -2.8493696796), (6.8051352017, -3.4284887176), (6.4957017701, -3.9837493036))
            Line((6.4957017701, -3.9837493036), (7.9202523618, -3.9933072165))
        make_face()
        with BuildLine():
            Line((7.1314545464, -5.2743962738), (6.4840112622, -4.0027487995))
            ThreePointArc((6.4840112622, -4.0027487995), (6.1278321211, -4.52924646), (5.7290101132, -5.0242256241))
            Line((5.7290101132, -5.0242256241), (7.1314545464, -5.2743962738))
        make_face()
        with BuildLine():
            Line((6.1374977678, -6.4037505534), (5.7142768322, -5.0409761242))
            ThreePointArc((5.7142768322, -5.0409761242), (5.2742424674, -5.4997060281), (4.7975052662, -5.9201641211))
            Line((4.7975052662, -5.9201641211), (6.1374977678, -6.4037505534))
        make_face()
        with BuildLine():
            Line((4.966976353, -7.3488805888), (4.7801530617, -5.9341837439))
            ThreePointArc((4.7801530617, -5.9341837439), (4.2689224606, -6.3119490671), (3.7279849274, -6.6457902751))
            Line((3.7279849274, -6.6457902751), (4.966976353, -7.3488805888))
        make_face()
        with BuildLine():
            Line((3.6535640719, -8.0825967097), (3.7085129909, -6.6566757016))
            ThreePointArc((3.7085129909, -6.6566757016), (3.140793327, -6.9426088236), (2.5512172498, -7.1802291429))
            Line((2.5512172498, -7.1802291429), (3.6535640719, -8.0825967097))
        make_face()
        with BuildLine():
            Line((2.2350454045, -8.5837912393), (2.5301857534, -7.1876672192))
            ThreePointArc((2.5301857534, -7.1876672192), (1.9223092879, -7.3735423645), (1.3010556969, -7.5081058912))
            Line((1.3010556969, -7.5081058912), (2.2350454045, -8.5837912393))
        make_face()
        with BuildLine():
            Line((0.7522285501, -8.8380457234), (1.2790696784, -7.5118826374))
            ThreePointArc((1.2790696784, -7.5118826374), (0.6485239105, -7.5923525167), (0.0134651405, -7.619988103))
            Line((0.0134651405, -7.619988103), (0.7522285501, -8.8380457234))
        make_face()
        with BuildLine():
            ThreePointArc((-0.0088429024, -7.619994869), (-0.6439183191, -7.5927445103), (-1.2745127836, -7.5126571308))
            Line((-1.2745127836, -7.5126571308), (-0.7522285501, -8.8380457234))
            Line((-0.7522285501, -8.8380457234), (-0.0088429024, -7.619994869))
        make_face()
        with BuildLine():
            ThreePointArc((-1.296501089, -7.5088937219), (-1.917836191, -7.3747070684), (-2.5258252953, -7.1892006911))
            Line((-2.5258252953, -7.1892006911), (-2.2350454045, -8.5837912393))
            Line((-2.2350454045, -8.5837912393), (-1.296501089, -7.5088937219))
        make_face()
        with BuildLine():
            ThreePointArc((-2.5468612998, -7.1817753738), (-3.1365814075, -6.9445127312), (-3.7044744121, -6.658924037))
            Line((-3.7044744121, -6.658924037), (-3.6535640719, -8.0825967097))
            Line((-3.6535640719, -8.0825967097), (-2.5468612998, -7.1817753738))
        make_face()
        with BuildLine():
            ThreePointArc((-3.7239529481, -6.648050424), (-4.2650928876, -6.3145374066), (-4.7765525447, -5.9370822621))
            Line((-4.7765525447, -5.9370822621), (-4.966976353, -7.3488805888))
            Line((-4.966976353, -7.3488805888), (-3.7239529481, -6.648050424))
        make_face()
        with BuildLine():
            ThreePointArc((-4.7939132502, -5.9230731677), (-5.2709054108, -5.5029043377), (-5.7112179573, -5.0444414402))
            Line((-5.7112179573, -5.0444414402), (-6.1374977678, -6.4037505534))
            Line((-6.1374977678, -6.4037505534), (-4.7939132502, -5.9230731677))
        make_face()
        with BuildLine():
            ThreePointArc((-5.7259613964, -5.0276998804), (-6.1250835821, -4.5329627301), (-6.4815820277, -4.0066812225))
            Line((-6.4815820277, -4.0066812225), (-7.1314545464, -5.2743962738))
            Line((-7.1314545464, -5.2743962738), (-5.7259613964, -5.0276998804))
        make_face()
        with BuildLine():
            ThreePointArc((-6.4932840584, -3.9876888214), (-6.8030542506, -3.4326160379), (-7.0654827841, -2.8536560809))
            Line((-7.0654827841, -2.8536560809), (-7.9202523618, -3.9933072165))
            Line((-7.9202523618, -3.9933072165), (-6.4932840584, -3.9876888214))
        make_face()
        with BuildLine():
            ThreePointArc((-7.0738067604, -2.8329592155), (-7.2853134346, -2.233519232), (-7.4461224648, -1.6185364495))
            Line((-7.4461224648, -1.6185364495), (-8.4811989371, -2.5973379812))
            Line((-8.4811989371, -2.5973379812), (-7.0738067604, -2.8329592155))
        make_face()
        with BuildLine():
            ThreePointArc((-7.4508289211, -1.5967305308), (-7.5579874154, -0.9701681444), (-7.6125507594, -0.3368544714))
            Line((-7.6125507594, -0.3368544714), (-8.7981568607, -1.1266480612))
            Line((-8.7981568607, -1.1266480612), (-7.4508289211, -1.5967305308))
        make_face()
        with BuildLine():
            ThreePointArc((-7.6135042995, -0.314566816), (-7.6132318591, 0.3210929144), (-7.5599798288, 0.9545181966))
            Line((-7.5599798288, 0.9545181966), (-8.8620078302, 0.3764534723))
            Line((-8.8620078302, 0.3764534723), (-7.6135042995, -0.314566816))
        make_face()
        with BuildLine():
            ThreePointArc((-7.557153021, 0.9766464135), (-7.4494574836, 1.6031167146), (-7.289922043, 2.218431114))
            Line((-7.289922043, 2.218431114), (-8.6709149695, 1.8687251249))
            Line((-8.6709149695, 1.8687251249), (-7.557153021, 0.9766464135))
        make_face()
        with BuildLine():
            ThreePointArc((-7.2833962094, 2.2397633037), (-7.0713757794, 2.8390217657), (-6.8101464726, 3.4185238073))
            Line((-6.8101464726, 3.4185238073), (-8.2303756721, 3.3072369579))
            Line((-8.2303756721, 3.3072369579), (-7.2833962094, 2.2397633037))
        make_face()
        with BuildLine():
            ThreePointArc((-6.8001093497, 3.4384462817), (-6.4898634689, 3.9932533296), (-6.1344553875, 4.5202717948))
            Line((-6.1344553875, 4.5202717948), (-7.5530634517, 4.6506056052))
            Line((-7.5530634517, 4.6506056052), (-6.8001093497, 3.4384462817))
        make_face()
        with BuildLine():
            Line((0.6328035034, 7.5936789322), (0, 8.87))
            Line((0, 8.87), (-0.6374096636, 7.5932936807))
            ThreePointArc((-0.6374096636, 7.5932936807), (-0.0023111215, 7.6199996495), (0.6328035034, 7.5936789322))
        make_face()
    extrude(amount=F1_DEPTH)


solid = f1.part
